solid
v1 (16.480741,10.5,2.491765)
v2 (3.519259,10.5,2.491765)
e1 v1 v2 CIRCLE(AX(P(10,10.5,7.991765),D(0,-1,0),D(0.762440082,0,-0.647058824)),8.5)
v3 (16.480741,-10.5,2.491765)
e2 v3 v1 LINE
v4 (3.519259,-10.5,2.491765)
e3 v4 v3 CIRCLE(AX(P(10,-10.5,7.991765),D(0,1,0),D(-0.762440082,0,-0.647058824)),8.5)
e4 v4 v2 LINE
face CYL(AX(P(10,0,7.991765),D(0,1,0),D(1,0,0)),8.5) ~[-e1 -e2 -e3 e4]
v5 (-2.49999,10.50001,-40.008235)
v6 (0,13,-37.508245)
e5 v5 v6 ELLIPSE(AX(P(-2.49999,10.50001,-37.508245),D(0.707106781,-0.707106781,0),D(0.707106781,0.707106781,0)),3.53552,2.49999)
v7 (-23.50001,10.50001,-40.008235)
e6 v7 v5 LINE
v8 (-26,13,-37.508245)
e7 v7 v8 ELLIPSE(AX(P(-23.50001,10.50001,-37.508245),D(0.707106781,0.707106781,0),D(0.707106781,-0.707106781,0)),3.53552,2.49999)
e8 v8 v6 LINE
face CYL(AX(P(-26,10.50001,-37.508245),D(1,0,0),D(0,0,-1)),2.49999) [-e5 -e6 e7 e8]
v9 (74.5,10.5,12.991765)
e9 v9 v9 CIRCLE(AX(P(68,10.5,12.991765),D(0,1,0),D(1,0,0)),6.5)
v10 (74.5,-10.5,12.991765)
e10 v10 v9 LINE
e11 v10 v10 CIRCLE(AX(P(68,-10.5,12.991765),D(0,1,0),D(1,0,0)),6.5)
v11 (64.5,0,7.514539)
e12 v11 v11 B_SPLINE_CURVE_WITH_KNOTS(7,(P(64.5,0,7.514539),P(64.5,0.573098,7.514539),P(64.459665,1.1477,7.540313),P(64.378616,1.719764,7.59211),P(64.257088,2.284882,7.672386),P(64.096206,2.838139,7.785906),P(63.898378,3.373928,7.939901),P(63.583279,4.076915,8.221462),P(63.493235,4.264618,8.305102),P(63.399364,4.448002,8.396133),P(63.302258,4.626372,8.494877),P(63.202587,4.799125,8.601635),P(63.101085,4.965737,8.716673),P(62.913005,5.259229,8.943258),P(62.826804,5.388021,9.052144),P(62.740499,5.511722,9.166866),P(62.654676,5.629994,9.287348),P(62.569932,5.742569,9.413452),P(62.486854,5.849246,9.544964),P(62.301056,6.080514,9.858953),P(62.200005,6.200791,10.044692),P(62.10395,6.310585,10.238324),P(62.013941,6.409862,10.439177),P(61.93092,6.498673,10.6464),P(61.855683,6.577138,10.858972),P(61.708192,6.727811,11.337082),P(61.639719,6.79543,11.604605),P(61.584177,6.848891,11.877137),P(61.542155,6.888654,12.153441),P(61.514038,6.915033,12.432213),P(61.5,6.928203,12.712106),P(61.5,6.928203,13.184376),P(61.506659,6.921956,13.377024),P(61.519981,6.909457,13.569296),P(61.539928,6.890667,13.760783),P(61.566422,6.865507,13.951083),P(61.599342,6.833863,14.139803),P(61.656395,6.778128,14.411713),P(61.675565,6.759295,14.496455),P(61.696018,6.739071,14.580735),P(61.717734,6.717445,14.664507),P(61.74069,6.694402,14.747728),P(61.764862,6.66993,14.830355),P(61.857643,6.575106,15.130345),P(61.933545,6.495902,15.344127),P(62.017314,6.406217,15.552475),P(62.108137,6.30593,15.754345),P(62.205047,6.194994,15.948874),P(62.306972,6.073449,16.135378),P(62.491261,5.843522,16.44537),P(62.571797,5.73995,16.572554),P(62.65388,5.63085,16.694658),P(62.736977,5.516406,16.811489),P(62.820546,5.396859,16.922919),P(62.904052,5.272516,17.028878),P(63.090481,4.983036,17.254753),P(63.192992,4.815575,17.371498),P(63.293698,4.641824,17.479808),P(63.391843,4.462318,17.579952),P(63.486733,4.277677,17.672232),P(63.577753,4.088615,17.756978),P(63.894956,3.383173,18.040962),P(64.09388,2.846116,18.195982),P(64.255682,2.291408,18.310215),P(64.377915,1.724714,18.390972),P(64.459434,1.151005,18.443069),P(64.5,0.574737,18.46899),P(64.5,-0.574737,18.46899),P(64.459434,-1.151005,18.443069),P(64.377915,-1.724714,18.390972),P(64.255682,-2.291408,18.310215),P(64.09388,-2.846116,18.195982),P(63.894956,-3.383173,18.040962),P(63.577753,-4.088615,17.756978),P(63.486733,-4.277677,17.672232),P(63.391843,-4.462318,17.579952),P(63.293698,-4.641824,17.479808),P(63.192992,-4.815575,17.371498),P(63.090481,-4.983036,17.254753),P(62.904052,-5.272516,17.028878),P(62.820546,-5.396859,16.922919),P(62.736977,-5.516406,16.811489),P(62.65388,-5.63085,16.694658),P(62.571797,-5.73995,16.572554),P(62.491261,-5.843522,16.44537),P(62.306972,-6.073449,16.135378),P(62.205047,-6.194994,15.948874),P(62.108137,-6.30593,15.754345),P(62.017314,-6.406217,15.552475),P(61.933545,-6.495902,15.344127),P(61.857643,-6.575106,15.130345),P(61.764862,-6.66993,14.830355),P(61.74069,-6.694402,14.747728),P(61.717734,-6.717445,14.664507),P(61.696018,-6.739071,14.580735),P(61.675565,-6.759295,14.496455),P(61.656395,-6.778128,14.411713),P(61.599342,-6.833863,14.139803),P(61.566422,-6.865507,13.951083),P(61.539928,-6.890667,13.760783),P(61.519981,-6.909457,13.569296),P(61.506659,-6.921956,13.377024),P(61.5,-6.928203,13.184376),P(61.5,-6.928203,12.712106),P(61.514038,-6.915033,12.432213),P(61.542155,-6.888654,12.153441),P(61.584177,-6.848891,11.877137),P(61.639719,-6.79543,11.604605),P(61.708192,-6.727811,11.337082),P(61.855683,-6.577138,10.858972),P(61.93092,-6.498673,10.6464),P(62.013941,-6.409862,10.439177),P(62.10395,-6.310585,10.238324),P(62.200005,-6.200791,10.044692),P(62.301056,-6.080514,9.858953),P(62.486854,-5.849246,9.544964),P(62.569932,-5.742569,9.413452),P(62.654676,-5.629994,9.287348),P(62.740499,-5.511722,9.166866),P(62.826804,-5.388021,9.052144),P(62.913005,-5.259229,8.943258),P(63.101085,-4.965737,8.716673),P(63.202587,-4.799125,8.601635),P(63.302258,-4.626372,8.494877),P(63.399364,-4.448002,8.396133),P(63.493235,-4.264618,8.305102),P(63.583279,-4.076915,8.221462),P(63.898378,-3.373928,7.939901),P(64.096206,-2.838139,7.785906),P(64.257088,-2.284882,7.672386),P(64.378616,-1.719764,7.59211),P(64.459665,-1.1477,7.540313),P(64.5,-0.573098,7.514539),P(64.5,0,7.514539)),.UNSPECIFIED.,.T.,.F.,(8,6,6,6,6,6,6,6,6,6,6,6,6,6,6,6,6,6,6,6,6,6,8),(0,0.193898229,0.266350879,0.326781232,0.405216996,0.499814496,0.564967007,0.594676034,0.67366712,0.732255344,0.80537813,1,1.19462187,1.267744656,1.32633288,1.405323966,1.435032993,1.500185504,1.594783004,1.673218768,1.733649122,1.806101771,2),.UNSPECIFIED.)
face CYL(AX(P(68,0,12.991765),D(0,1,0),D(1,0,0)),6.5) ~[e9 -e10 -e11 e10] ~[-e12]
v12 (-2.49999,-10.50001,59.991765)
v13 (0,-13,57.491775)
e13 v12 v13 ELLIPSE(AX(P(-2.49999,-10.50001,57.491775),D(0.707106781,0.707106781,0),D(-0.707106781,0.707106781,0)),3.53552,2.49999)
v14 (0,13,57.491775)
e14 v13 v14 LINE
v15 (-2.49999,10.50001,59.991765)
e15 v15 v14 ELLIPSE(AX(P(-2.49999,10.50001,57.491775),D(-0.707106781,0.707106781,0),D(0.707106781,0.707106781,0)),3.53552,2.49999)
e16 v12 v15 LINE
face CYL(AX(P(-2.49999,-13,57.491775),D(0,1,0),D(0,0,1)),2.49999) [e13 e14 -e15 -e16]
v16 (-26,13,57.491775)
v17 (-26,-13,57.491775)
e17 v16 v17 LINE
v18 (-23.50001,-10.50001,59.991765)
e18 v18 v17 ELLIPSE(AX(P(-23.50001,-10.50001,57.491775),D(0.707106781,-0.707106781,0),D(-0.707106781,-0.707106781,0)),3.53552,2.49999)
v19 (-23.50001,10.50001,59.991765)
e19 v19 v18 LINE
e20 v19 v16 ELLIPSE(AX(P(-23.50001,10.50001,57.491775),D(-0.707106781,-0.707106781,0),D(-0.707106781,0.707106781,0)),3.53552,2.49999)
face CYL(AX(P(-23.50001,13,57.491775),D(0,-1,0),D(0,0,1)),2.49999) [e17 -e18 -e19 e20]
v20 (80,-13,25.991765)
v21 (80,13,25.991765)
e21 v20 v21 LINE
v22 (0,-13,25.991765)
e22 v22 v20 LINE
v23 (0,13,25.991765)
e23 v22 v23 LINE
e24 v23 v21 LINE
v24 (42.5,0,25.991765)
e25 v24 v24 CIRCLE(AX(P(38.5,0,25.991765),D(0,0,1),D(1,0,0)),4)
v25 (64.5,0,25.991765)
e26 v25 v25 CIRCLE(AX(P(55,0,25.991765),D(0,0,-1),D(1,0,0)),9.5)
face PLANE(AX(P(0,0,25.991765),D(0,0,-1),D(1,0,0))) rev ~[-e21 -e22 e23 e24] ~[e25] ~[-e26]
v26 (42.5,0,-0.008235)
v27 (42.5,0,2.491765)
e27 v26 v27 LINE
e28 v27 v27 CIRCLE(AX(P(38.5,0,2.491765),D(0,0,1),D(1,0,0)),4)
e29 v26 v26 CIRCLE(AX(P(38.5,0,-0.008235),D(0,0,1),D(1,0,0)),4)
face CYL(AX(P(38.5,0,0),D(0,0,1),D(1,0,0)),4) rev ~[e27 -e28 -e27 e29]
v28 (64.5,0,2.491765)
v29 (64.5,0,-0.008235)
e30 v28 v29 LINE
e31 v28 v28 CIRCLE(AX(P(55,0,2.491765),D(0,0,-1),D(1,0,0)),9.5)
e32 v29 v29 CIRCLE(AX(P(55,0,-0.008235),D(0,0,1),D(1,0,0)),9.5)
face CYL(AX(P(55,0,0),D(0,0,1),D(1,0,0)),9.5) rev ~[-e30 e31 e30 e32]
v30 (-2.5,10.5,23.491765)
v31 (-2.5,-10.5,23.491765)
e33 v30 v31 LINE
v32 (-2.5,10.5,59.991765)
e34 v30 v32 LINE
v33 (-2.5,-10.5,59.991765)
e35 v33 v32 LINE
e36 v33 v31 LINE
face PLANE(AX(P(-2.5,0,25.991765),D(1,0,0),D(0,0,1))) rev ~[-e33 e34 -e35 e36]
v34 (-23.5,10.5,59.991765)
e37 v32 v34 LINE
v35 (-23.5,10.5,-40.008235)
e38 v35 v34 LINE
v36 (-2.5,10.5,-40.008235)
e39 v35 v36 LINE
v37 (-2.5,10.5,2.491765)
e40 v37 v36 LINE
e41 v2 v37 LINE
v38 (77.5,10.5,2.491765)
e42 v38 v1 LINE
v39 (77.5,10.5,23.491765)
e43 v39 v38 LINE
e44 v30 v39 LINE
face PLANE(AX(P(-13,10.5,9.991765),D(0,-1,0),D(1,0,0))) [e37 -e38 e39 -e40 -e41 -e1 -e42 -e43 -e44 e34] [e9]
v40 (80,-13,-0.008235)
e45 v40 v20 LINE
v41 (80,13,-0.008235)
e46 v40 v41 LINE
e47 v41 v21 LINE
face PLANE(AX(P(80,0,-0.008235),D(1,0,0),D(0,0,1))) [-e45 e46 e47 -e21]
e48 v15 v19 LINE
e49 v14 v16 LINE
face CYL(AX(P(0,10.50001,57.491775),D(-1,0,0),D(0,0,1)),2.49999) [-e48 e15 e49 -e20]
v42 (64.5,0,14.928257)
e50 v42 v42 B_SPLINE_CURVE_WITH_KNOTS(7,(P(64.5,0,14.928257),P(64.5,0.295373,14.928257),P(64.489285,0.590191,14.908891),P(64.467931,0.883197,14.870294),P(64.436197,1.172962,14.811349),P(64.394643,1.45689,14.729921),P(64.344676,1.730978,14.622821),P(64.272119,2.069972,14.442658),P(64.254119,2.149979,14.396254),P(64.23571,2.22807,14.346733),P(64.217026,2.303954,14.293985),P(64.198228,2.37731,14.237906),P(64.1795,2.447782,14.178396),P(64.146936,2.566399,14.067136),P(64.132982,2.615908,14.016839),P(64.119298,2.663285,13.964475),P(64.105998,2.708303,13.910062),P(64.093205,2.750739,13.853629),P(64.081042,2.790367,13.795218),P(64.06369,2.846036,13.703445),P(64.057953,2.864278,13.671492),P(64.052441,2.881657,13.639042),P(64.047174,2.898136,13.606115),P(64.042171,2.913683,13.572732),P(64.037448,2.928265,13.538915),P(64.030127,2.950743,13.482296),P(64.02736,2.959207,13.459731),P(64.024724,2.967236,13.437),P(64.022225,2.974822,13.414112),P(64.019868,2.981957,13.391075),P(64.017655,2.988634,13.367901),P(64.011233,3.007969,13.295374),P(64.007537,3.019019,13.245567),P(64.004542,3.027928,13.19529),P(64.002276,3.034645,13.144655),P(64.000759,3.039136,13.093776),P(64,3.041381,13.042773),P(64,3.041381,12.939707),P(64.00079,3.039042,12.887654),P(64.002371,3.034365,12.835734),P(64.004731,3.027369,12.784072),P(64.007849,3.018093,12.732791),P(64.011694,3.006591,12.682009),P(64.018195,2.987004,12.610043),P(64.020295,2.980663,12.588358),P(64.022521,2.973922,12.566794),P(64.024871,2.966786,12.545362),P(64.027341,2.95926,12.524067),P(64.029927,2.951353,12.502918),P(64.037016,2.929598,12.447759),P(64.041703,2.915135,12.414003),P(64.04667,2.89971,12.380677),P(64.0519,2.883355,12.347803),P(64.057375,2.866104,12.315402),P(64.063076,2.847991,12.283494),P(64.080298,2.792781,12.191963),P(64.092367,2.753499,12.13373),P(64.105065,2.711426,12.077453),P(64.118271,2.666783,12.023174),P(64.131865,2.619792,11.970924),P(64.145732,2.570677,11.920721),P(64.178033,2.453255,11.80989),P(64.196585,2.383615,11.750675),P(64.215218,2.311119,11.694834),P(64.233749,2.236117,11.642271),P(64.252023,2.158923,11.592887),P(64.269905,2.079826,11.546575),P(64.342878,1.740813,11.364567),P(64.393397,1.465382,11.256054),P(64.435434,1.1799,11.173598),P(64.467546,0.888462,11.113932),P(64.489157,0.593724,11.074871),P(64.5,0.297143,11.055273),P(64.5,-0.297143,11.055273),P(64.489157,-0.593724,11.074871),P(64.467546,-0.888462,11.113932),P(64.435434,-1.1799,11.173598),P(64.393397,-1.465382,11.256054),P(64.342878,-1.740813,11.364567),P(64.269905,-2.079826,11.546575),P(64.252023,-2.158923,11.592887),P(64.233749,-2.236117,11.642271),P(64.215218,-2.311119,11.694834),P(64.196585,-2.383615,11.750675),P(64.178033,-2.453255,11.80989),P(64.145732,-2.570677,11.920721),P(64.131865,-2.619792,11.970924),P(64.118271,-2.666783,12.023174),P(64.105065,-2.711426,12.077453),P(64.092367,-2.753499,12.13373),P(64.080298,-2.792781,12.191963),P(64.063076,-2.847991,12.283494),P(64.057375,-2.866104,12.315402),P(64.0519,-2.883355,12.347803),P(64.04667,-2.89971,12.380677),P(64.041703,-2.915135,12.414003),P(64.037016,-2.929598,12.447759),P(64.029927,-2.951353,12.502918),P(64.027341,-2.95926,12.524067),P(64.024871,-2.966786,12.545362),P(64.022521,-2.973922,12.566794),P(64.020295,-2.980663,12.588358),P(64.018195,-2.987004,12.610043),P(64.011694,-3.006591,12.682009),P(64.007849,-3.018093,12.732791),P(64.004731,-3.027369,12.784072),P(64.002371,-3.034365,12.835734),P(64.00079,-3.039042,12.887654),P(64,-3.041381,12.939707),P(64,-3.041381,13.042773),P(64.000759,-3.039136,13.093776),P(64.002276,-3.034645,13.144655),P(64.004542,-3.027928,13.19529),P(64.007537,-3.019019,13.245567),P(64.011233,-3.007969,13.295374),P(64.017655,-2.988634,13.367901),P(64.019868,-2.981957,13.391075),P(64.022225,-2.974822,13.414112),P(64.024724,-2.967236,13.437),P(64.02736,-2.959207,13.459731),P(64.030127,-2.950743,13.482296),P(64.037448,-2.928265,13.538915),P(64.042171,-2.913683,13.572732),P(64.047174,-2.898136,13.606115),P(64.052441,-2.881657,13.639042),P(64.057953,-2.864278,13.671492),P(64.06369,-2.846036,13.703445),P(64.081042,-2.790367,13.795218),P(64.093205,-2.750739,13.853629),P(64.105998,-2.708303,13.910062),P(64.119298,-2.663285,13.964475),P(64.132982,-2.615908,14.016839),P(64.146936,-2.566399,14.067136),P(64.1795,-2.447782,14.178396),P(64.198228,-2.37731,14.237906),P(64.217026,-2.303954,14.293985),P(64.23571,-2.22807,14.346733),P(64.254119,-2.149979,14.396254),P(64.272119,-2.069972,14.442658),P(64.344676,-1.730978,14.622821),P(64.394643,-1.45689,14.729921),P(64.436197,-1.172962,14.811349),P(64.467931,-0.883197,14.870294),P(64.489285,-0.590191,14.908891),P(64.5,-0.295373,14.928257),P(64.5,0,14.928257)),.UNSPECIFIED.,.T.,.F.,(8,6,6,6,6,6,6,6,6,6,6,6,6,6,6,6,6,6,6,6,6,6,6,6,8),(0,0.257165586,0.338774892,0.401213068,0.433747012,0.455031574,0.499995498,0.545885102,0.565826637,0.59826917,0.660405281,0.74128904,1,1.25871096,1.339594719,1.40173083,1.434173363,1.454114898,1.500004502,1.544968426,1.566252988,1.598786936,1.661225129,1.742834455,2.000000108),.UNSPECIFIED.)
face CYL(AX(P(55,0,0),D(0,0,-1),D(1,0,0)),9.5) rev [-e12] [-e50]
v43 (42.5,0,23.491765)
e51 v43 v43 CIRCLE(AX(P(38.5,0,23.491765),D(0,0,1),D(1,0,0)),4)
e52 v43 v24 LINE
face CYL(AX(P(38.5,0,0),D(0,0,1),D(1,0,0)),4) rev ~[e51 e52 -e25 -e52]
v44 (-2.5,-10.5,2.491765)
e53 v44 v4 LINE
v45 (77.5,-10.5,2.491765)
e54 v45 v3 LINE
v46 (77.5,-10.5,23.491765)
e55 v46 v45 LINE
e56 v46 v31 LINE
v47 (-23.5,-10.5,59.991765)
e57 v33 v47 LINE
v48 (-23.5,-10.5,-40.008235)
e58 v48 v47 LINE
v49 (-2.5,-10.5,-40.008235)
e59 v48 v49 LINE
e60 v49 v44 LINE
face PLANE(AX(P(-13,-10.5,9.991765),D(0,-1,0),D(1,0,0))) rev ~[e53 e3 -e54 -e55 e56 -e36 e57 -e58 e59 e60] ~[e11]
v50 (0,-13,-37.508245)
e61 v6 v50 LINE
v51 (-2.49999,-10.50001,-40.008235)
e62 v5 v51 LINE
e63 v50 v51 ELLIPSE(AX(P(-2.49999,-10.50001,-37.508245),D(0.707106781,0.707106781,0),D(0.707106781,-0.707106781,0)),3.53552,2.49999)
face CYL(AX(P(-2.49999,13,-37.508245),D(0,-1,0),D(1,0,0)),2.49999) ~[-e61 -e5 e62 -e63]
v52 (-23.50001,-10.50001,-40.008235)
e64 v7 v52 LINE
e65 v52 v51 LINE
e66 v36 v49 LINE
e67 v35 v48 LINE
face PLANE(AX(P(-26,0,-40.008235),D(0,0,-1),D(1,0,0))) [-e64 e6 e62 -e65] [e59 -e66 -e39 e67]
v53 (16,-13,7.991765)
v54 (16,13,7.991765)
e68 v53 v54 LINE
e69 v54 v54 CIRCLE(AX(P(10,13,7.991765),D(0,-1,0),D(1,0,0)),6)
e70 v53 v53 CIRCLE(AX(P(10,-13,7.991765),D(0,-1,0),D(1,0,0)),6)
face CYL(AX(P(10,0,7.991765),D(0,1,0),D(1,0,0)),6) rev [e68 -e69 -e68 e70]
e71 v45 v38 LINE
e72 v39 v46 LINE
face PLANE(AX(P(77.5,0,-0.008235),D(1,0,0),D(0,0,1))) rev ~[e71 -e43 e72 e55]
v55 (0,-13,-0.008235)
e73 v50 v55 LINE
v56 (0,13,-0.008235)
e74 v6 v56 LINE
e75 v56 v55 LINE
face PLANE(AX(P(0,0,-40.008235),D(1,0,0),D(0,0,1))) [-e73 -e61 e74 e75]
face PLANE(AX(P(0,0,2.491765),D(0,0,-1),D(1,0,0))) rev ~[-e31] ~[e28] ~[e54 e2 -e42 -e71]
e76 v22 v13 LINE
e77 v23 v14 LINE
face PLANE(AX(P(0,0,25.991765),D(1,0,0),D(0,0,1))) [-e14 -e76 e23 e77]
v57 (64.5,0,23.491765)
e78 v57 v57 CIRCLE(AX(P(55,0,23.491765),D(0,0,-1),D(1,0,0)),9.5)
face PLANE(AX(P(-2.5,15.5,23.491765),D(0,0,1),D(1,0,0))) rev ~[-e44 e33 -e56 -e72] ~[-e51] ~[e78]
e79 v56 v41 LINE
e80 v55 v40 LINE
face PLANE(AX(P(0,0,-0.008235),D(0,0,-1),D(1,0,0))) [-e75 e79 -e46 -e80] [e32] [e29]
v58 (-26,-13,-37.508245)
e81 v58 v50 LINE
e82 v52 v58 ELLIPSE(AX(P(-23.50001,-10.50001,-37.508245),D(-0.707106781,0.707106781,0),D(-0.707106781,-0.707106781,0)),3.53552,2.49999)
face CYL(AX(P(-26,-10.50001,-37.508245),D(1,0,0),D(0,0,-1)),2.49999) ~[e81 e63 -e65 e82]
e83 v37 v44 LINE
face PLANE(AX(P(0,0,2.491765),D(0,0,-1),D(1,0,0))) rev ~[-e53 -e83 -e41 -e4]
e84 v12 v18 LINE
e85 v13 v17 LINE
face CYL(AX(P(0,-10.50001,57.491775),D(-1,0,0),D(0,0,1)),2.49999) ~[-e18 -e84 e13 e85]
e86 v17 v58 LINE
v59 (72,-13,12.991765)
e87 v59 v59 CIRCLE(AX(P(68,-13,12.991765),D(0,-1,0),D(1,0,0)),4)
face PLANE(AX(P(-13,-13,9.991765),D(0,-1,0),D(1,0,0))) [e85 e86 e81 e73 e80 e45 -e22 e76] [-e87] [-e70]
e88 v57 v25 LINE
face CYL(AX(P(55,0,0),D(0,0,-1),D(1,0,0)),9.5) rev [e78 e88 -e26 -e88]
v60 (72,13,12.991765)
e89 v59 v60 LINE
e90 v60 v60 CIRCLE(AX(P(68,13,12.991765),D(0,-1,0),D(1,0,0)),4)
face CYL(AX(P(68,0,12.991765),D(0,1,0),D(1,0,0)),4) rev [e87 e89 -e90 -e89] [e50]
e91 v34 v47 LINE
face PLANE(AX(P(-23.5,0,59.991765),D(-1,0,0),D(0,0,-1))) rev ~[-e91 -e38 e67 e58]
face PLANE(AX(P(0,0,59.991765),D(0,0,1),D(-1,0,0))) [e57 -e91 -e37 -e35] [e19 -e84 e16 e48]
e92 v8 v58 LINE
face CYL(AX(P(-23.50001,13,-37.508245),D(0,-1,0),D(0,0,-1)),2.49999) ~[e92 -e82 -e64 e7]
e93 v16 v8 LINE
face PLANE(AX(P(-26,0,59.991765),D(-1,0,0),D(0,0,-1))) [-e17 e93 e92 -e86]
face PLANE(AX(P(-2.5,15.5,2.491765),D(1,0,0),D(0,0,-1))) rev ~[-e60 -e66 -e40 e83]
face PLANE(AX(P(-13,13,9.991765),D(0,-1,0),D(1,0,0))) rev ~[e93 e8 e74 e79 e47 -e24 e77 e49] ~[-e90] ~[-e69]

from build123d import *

# Parameters (mm, degrees)
F0_W        = 80
F0_H        = 26
F0_R        = 6
F0_R_2      = 4
F1_DEPTH    = 13
F2_T        = 2.5
F2_T3_DEPTH = 31
F3_R        = 9.5
F3_R_2      = 4
F4_DEPTH    = 50
F5_R        = 2.49999


# Not quite as in the source:
# - a fillet or chamfer is up to 0.001 mm smaller than in the source, because OpenCascade refuses the exact size
# - a shell that OpenCascade refuses in one call is made with other operations: the cavity is built on its own and cut out


with BuildPart() as f1:
    # F0 (on Front) → F1 (new body, symmetric)
    with BuildSketch(Plane.XZ):
        Polygon((0, 25.9917649148), (0, 59.9917649148), (-26, 59.9917649148), (-26, -40.0082350852), (0, -40.0082350852), (0, -0.0082350852), align=None)
        with Locations((40, 12.9917649148)):
            Rectangle(F0_W, F0_H)
        with Locations((10, 7.9917649148)):
            Circle(F0_R, mode=Mode.SUBTRACT)
        with Locations((68, 12.9917649148)):
            Circle(F0_R_2, mode=Mode.SUBTRACT)
    extrude(amount=F1_DEPTH, both=True)

    # F2: shell of thickness 2.5, made by hand


with BuildPart() as f2_core1:
    # F2_t2: copy of F1
    add(f1.part)

    # the walls: a layer under each face that stays
    f2_faces = [f2_core1.faces().sort_by_distance(p)[0] for p in [
        (0, 0, 42.9917649148),
        (40, 0, 25.9917649148),
        (80, 0, 12.9917649148),
        (40, 0, -0.0082350852),
        (0, 0, -20.0082350852),
        (-26, 0, 9.9917649148),
        (27, -13, 9.9917649148),
        (4, 0, 7.9917649148),
        (64, 0, 12.9917649148),
        (27, 13, 9.9917649148),
    ]]
    thicken(f2_faces, amount=-F2_T, mode=Mode.SUBTRACT)

    # F2_s4 → F2_t3 (cut)
    with BuildSketch(Plane.XZ.offset(-15.5)):
        Polygon((0.025, 26.0167649148), (-2.5, 25.9917649148), (-2.5, 23.4917649148), (0, 23.4917649148), align=None)
        Polygon((0.025, -0.0332350852), (0, 2.4917649148), (-2.5, 2.4917649148), (-2.5, -0.0082350852), align=None)
    extrude(amount=F2_T3_DEPTH, mode=Mode.SUBTRACT)


with BuildPart() as f1_1:
    add(f1.part)

    # what is left inside the walls is the cavity
    f2_cavity = [f2_core1.part.solids().sort_by_distance(p)[0] for p in [
        (-10.875, 10.475, 4.436209),
    ]]
    add(f2_cavity, mode=Mode.SUBTRACT)

    # F3 (on Top) → F4 (cut, symmetric)
    with BuildSketch(Plane.XY):
        with Locations((55, 0)):
            Circle(F3_R)
        with Locations((38.5, 0)):
            Circle(F3_R_2)
    extrude(amount=F4_DEPTH, both=True, mode=Mode.SUBTRACT)

    # F5 (radius 2.5 in the source; OpenCascade refuses exactly that, so slightly less here)
    f5_edges = [f1_1.edges().sort_by_distance(p)[0] for p in [
        (0, 0, 59.991765),
        (-13, -13, 59.991765),
        (-13, 13, 59.991765),
        (-26, 0, 59.991765),
        (-26, 0, -40.008235),
        (-13, 13, -40.008235),
        (0, 0, -40.008235),
        (-13, -13, -40.008235),
    ]]
    fillet(f5_edges, radius=F5_R)


solid = f1_1.part
